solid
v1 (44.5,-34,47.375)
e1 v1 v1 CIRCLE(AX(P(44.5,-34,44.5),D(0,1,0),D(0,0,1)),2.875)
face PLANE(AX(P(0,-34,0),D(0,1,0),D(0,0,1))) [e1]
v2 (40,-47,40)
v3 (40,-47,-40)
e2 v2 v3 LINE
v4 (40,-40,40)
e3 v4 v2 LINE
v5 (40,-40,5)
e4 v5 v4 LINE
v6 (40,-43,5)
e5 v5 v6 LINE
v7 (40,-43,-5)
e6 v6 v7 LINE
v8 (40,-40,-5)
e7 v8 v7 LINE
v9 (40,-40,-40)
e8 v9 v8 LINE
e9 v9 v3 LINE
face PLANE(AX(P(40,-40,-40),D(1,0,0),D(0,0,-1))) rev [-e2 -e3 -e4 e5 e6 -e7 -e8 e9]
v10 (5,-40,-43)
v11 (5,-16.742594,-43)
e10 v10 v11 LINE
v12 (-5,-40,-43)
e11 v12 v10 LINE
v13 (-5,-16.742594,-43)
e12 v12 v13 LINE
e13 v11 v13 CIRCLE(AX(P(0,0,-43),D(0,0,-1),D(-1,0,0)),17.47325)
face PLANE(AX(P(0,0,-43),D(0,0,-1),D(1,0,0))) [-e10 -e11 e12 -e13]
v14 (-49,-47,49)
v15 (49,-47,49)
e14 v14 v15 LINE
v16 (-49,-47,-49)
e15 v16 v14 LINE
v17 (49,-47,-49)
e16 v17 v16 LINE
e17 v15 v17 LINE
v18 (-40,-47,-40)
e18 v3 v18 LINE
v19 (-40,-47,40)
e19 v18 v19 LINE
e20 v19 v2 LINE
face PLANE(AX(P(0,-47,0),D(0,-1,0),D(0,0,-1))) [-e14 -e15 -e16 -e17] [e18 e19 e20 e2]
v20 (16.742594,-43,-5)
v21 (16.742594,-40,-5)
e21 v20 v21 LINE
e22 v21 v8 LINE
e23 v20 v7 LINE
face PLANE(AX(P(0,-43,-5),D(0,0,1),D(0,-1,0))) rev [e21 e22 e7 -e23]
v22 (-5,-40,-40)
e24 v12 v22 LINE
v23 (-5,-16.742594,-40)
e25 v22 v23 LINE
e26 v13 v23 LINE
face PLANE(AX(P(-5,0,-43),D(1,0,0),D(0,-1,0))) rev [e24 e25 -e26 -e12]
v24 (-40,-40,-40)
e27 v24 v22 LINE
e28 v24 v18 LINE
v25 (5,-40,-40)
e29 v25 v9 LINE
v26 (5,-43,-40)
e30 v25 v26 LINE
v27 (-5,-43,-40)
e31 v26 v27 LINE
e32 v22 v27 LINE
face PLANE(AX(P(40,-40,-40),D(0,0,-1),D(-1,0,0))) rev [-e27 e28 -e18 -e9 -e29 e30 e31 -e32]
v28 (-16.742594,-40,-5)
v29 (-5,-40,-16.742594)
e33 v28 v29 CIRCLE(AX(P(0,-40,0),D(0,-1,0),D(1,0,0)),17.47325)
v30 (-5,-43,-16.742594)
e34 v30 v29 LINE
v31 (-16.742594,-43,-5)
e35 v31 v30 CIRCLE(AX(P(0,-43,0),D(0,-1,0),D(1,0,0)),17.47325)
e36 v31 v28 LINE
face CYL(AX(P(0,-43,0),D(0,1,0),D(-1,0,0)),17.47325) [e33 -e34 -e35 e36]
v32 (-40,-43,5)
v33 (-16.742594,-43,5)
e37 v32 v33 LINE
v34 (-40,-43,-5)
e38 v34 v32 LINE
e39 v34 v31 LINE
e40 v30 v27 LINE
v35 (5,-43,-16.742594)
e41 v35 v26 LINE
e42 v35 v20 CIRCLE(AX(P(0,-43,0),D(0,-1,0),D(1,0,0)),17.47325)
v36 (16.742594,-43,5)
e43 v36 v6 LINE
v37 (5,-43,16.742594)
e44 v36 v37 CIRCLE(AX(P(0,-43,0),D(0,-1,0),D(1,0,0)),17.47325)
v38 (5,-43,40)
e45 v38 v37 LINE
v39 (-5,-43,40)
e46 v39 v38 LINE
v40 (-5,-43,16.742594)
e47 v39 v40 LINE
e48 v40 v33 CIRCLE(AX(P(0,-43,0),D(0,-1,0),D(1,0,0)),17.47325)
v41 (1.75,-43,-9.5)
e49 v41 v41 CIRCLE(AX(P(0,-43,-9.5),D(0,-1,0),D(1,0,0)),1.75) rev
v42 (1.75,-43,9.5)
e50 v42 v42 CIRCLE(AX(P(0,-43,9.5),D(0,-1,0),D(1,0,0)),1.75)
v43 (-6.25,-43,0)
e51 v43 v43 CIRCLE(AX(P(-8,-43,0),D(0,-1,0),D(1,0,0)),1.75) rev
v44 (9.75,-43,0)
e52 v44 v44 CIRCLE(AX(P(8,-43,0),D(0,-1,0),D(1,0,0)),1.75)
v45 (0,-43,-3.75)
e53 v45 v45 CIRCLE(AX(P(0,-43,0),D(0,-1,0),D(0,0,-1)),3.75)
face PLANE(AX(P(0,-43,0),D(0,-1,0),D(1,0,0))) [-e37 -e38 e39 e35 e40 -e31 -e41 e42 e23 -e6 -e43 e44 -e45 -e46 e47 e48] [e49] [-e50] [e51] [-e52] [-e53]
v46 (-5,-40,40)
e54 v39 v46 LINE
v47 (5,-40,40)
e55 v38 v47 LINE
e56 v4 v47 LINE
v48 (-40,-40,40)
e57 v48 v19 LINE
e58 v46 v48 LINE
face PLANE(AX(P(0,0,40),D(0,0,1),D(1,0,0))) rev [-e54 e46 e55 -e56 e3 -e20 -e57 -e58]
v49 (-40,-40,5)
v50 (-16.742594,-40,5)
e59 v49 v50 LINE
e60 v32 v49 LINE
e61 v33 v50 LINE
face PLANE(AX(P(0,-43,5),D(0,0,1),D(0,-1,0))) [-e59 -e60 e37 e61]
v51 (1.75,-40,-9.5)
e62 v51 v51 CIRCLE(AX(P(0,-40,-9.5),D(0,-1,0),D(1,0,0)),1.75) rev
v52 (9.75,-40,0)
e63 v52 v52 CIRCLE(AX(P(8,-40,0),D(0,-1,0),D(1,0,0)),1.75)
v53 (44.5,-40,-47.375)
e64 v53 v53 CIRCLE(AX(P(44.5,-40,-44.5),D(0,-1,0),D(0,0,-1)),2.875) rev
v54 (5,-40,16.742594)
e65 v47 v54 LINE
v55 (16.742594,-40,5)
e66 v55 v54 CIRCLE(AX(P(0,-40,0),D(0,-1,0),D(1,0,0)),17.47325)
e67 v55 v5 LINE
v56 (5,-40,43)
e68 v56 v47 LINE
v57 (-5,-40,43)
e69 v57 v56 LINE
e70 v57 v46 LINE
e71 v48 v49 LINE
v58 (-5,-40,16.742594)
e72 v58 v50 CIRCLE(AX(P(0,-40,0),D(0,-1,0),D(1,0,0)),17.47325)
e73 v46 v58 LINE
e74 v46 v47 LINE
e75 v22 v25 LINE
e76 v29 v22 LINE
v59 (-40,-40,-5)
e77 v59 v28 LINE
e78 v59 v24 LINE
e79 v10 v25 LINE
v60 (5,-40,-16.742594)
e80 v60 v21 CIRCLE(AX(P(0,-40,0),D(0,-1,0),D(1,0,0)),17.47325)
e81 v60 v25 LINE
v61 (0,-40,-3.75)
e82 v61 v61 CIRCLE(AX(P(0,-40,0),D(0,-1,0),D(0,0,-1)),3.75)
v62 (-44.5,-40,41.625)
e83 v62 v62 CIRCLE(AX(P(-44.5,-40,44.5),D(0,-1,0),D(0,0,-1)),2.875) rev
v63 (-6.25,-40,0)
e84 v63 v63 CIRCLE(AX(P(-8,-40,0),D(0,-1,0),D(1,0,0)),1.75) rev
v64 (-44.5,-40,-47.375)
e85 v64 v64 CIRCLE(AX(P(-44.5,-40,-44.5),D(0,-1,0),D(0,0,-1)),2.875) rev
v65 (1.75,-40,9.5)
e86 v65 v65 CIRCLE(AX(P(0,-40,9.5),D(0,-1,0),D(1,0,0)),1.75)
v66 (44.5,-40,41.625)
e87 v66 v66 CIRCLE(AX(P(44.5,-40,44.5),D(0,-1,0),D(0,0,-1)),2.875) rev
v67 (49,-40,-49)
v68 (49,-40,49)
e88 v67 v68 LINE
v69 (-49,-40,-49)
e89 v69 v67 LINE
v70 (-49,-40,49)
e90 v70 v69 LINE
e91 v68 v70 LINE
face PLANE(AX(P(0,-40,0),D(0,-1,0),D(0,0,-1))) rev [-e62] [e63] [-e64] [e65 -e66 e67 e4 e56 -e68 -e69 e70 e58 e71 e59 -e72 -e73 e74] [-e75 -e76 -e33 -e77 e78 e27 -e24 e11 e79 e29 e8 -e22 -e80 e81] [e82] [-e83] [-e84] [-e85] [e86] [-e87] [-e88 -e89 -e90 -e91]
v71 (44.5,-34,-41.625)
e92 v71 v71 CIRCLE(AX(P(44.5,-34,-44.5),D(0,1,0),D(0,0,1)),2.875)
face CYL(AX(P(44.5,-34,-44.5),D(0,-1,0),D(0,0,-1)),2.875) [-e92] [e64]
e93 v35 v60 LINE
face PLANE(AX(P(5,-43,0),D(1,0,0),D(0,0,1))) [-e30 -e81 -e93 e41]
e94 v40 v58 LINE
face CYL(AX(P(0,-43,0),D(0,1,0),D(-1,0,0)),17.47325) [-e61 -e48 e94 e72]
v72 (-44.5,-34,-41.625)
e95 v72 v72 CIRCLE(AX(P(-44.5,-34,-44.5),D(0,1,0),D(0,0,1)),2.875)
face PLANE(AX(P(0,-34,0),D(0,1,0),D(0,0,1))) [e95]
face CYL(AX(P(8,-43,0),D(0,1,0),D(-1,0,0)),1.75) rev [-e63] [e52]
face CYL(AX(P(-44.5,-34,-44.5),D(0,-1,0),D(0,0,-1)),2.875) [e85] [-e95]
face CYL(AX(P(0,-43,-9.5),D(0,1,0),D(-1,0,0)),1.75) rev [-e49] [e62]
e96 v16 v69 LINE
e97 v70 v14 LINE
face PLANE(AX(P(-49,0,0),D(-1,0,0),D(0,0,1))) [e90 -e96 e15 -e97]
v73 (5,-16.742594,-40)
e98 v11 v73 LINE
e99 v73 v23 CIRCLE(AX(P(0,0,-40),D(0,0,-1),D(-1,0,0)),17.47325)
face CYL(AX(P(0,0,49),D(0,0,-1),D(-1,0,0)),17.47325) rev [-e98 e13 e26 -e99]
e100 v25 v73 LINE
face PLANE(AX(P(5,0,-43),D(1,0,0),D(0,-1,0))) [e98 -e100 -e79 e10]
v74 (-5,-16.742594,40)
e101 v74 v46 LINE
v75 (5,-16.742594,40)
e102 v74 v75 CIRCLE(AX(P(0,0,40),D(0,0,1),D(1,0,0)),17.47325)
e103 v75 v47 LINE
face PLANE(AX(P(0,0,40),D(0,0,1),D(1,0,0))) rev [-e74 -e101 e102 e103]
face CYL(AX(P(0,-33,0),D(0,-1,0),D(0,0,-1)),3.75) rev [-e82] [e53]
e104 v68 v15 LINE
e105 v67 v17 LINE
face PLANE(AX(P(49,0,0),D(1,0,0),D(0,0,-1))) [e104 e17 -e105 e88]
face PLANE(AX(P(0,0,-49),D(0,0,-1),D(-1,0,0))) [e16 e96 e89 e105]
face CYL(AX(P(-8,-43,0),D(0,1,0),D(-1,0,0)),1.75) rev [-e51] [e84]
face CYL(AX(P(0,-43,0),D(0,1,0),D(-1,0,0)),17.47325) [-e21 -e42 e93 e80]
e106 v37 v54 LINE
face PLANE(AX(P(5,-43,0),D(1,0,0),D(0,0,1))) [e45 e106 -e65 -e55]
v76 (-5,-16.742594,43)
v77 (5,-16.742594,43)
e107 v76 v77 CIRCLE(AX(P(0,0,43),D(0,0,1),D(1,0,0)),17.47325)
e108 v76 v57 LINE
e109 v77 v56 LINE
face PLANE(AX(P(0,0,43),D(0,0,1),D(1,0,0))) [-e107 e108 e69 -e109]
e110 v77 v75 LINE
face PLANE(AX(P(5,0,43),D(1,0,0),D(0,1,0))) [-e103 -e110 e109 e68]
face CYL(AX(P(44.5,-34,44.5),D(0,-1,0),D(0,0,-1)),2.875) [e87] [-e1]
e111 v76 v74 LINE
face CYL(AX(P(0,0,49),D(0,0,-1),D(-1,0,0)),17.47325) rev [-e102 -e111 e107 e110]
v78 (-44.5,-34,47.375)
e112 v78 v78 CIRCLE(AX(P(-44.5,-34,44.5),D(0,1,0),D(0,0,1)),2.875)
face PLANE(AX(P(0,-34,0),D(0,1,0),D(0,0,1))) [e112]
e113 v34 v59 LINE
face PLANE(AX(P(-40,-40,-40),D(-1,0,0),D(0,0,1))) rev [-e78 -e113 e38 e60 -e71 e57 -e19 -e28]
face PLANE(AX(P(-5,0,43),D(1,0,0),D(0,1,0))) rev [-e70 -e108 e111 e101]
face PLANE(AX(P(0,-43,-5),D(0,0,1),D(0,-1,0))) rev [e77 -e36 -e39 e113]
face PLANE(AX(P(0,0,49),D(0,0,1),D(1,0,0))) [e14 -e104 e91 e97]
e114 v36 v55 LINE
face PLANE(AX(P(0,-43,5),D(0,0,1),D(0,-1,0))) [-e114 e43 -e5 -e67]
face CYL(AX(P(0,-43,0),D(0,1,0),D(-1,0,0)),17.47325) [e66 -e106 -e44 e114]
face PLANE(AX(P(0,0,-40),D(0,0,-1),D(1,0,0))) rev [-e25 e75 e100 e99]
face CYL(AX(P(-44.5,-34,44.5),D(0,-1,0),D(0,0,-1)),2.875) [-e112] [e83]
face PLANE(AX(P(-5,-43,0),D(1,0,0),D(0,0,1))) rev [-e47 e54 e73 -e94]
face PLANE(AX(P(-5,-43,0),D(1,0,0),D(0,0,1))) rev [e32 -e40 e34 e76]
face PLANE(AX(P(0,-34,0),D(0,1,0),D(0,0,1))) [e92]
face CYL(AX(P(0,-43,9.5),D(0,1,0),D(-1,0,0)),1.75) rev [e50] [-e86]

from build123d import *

# Parameters (mm, degrees)
SKETCH2_R                  = 1.75
SKETCH2_W                  = 10
SKETCH2_H                  = 10
BOSS_EXTRUDE1_DEPTH        = 3
CIRPATTERN1_COUNT          = 4
CIRPATTERN2_START          = 40
CIRPATTERN2_OUTLINE_R      = 1.75
CIRPATTERN2_DEPTH          = 3
CIRPATTERN2_START_2        = -43
CIRPATTERN2_2_OUTLINE_R    = 1.75
CIRPATTERN2_2_DEPTH        = 3
CIRPATTERN2_3_OUTLINE_R    = 1.75
CIRPATTERN2_3_DEPTH        = 3
CIRPATTERN2_4_OUTLINE_R    = 1.75
CIRPATTERN2_4_DEPTH        = 3
BOSS_EXTRUDE2_DEPTH        = 50
BOSS_EXTRUDE2_DEPTH_BACK   = 50
SKETCH3_W                  = 10
SKETCH3_H                  = 10
BOSS_EXTRUDE2_2_DEPTH      = 50
BOSS_EXTRUDE2_2_DEPTH_BACK = 50
BOSS_EXTRUDE2_3_DEPTH      = 50
BOSS_EXTRUDE2_3_DEPTH_BACK = 50
BOSS_EXTRUDE2_4_DEPTH      = 50
BOSS_EXTRUDE2_4_DEPTH_BACK = 50
SKETCH4_W                  = 100
SKETCH4_H                  = 100
SKETCH4_W_2                = 80
SKETCH4_H_2                = 80
BOSS_EXTRUDE3_DEPTH        = 10
SKETCH5_W                  = 100
SKETCH5_H                  = 100
SKETCH5_W_2                = 80
SKETCH5_H_2                = 80
BOSS_EXTRUDE4_DEPTH        = 5
CUT_EXTRUDE1_START         = -100
CUT_EXTRUDE1_DEPTH         = 100
CUT_EXTRUDE1_START_2       = -55
CUT_EXTRUDE1_2_OUTLINE_W   = 10
CUT_EXTRUDE1_2_OUTLINE_H   = 3
CUT_EXTRUDE1_2_DEPTH       = 10
CUT_EXTRUDE1_3_OUTLINE_W   = 90
CUT_EXTRUDE1_3_OUTLINE_H   = 3
CUT_EXTRUDE1_3_DEPTH       = 100
SKETCH7_R                  = 3.75
CUT_EXTRUDE2_DEPTH         = 10
SKETCH8_R                  = 3.75
CUT_EXTRUDE3_DEPTH         = 117.828934772
SKETCH9_R                  = 3.75
CUT_EXTRUDE4_DEPTH         = 117.828934772
SKETCH10_W                 = 100
SKETCH10_H                 = 100
CUT_EXTRUDE5_DEPTH         = 3
CUT_EXTRUDE6_DEPTH         = 1
SKETCH12_W                 = 99
SKETCH12_H                 = 97
CUT_EXTRUDE7_DEPTH         = 1
CUT_EXTRUDE8_DEPTH         = 1
SKETCH14_W                 = 98
SKETCH14_H                 = 97
CUT_EXTRUDE9_DEPTH         = 1
CUT_EXTRUDE10_DEPTH        = 117.404467268
CUT_EXTRUDE10_DEPTH_BACK   = 117.404467268
SKETCH15_W                 = 9
SKETCH15_H                 = 5
SKETCH16_R                 = 3.125
CUT_EXTRUDE11_DEPTH        = 8
SKETCH18_W                 = 98
SKETCH18_H                 = 98
SKETCH18_W_2               = 33.4851887
SKETCH18_H_2               = 3
CUT_EXTRUDE12_DEPTH        = 85
SKETCH20_R                 = 2.875
BOSS_EXTRUDE5_DEPTH        = 6
SKETCH21_R                 = 1.75
SKETCH21_R_2               = 3.75
CUT_EXTRUDE13_DEPTH        = 115.341593482


with BuildPart() as part:
    # Sketch2 → Boss-Extrude1 (new body)
    # profile 1 of 13: a face of its own
    with BuildSketch(Plane.XY.offset(40)):
        with BuildLine():
            ThreePointArc((5, -16.74259435), (0, -17.47325), (-5, -16.74259435))
            Line((-5, -16.74259435), (-5, -50))
            Line((-5, -50), (5, -50))
            Line((5, -50), (5, -16.74259435))
        make_face()
    # profile 2 of 13: a face of its own
    with BuildSketch(Plane.XY.offset(40)):
        with BuildLine():
            Line((5, -5), (-5, -5))
            Line((-5, -5), (-5, -16.74259435))
            ThreePointArc((-5, -16.74259435), (0, -17.47325), (5, -16.74259435))
            Line((5, -16.74259435), (5, -5))
        make_face()
        with Locations((0, -9.5)):
            Circle(SKETCH2_R, mode=Mode.SUBTRACT)
    # profile 3 of 13: a face of its own
    with BuildSketch(Plane.XY.offset(40)):
        with BuildLine():
            Line((16.74259435, -5), (5, -5))
            Line((5, -5), (5, -16.74259435))
            ThreePointArc((5, -16.74259435), (12.355453564, -12.355453564), (16.74259435, -5))
        make_face()
    # profile 4 of 13: a face of its own
    with BuildSketch(Plane.XY.offset(40)):
        with BuildLine():
            Line((5, 5), (5, -5))
            Line((5, -5), (16.74259435, -5))
            ThreePointArc((16.74259435, -5), (17.289621197, -2.526551883), (17.47325, 0))
            ThreePointArc((17.47325, 0), (17.289621197, 2.526551883), (16.74259435, 5))
            Line((16.74259435, 5), (5, 5))
        make_face()
        with Locations((8, 0)):
            Circle(SKETCH2_R, mode=Mode.SUBTRACT)
    # profile 5 of 13: a face of its own
    with BuildSketch(Plane.XY.offset(40)):
        Rectangle(SKETCH2_W, SKETCH2_H)
    # profile 6 of 13: a face of its own
    with BuildSketch(Plane.XY.offset(40)):
        with BuildLine():
            Line((-5, -5), (-16.74259435, -5))
            ThreePointArc((-16.74259435, -5), (-12.355453564, -12.355453564), (-5, -16.74259435))
            Line((-5, -16.74259435), (-5, -5))
        make_face()
    # profile 7 of 13: a face of its own
    with BuildSketch(Plane.XY.offset(40)):
        with BuildLine():
            ThreePointArc((-16.74259435, 5), (-17.47325, 0), (-16.74259435, -5))
            Line((-16.74259435, -5), (-5, -5))
            Line((-5, -5), (-5, 5))
            Line((-5, 5), (-16.74259435, 5))
        make_face()
        with Locations((-8, 0)):
            Circle(SKETCH2_R, mode=Mode.SUBTRACT)
    # profile 8 of 13: a face of its own
    with BuildSketch(Plane.XY.offset(40)):
        with BuildLine():
            ThreePointArc((-5, 16.74259435), (-12.355453564, 12.355453564), (-16.74259435, 5))
            Line((-16.74259435, 5), (-5, 5))
            Line((-5, 5), (-5, 16.74259435))
        make_face()
    # profile 9 of 13: a face of its own
    with BuildSketch(Plane.XY.offset(40)):
        with BuildLine():
            Line((-5, 16.74259435), (-5, 5))
            Line((-5, 5), (5, 5))
            Line((5, 5), (5, 16.74259435))
            ThreePointArc((5, 16.74259435), (0, 17.47325), (-5, 16.74259435))
        make_face()
        with Locations((0, 9.5)):
            Circle(SKETCH2_R, mode=Mode.SUBTRACT)
    # profile 10 of 13: a face of its own
    with BuildSketch(Plane.XY.offset(40)):
        with BuildLine():
            Line((5, 16.74259435), (5, 5))
            Line((5, 5), (16.74259435, 5))
            ThreePointArc((16.74259435, 5), (12.355453564, 12.355453564), (5, 16.74259435))
        make_face()
    # profile 11 of 13: a face of its own
    with BuildSketch(Plane.XY.offset(40)):
        with BuildLine():
            ThreePointArc((17.47325, 0), (17.289621197, -2.526551883), (16.74259435, -5))
            Line((16.74259435, -5), (50, -5))
            Line((50, -5), (50, 5))
            Line((50, 5), (16.74259435, 5))
            ThreePointArc((16.74259435, 5), (17.289621197, 2.526551883), (17.47325, 0))
        make_face()
    # profile 12 of 13: a face of its own
    with BuildSketch(Plane.XY.offset(40)):
        with BuildLine():
            Line((-50, 5), (-50, -5))
            Line((-50, -5), (-16.74259435, -5))
            ThreePointArc((-16.74259435, -5), (-17.47325, 0), (-16.74259435, 5))
            Line((-16.74259435, 5), (-50, 5))
        make_face()
    # profile 13 of 13: a face of its own
    with BuildSketch(Plane.XY.offset(40)):
        with BuildLine():
            Line((-5, 50), (-5, 16.74259435))
            ThreePointArc((-5, 16.74259435), (0, 17.47325), (5, 16.74259435))
            Line((5, 16.74259435), (5, 50))
            Line((5, 50), (-5, 50))
        make_face()
    extrude(amount=BOSS_EXTRUDE1_DEPTH)


with BuildPart() as cirpattern1_1:
    # CirPattern1: pattern copy
    add(part.part.rotate(Axis((0, 0, 0), (1, 0, 0)), 1 * 360 / CIRPATTERN1_COUNT))


with BuildPart() as cirpattern1_2:
    # CirPattern1: pattern copy
    add(part.part.rotate(Axis((0, 0, 0), (1, 0, 0)), 2 * 360 / CIRPATTERN1_COUNT))


with BuildPart() as cirpattern1_3:
    # CirPattern1: pattern copy
    add(part.part.rotate(Axis((0, 0, 0), (1, 0, 0)), 3 * 360 / CIRPATTERN1_COUNT))

    # Cut-Extrude1 3 outline → Cut-Extrude1 3 (cut)
    with BuildSketch(Plane.ZY.offset(50).offset(CUT_EXTRUDE1_START)):
        with Locations((5, 41.5)):
            Rectangle(CUT_EXTRUDE1_3_OUTLINE_W, CUT_EXTRUDE1_3_OUTLINE_H)
    extrude(amount=CUT_EXTRUDE1_3_DEPTH, mode=Mode.SUBTRACT)


with BuildPart() as body_5:
    # CirPattern2: read off the stored shape, not the designer's step
    # CirPattern2 outline → CirPattern2 (new body)
    with BuildSketch(Plane.XY.offset(CIRPATTERN2_START)):
        with BuildLine():
            ThreePointArc((5, -16.74259435), (12.355453564, -12.355453564), (16.74259435, -5))
            Line((16.74259435, -5), (50, -5))
            Line((50, -5), (50, 5))
            Line((50, 5), (16.74259435, 5))
            ThreePointArc((16.74259435, 5), (12.355453564, 12.355453564), (5, 16.74259435))
            Line((5, 16.74259435), (5, 50))
            Line((5, 50), (-5, 50))
            Line((-5, 50), (-5, 16.74259435))
            ThreePointArc((-5, 16.74259435), (-12.355453564, 12.355453564), (-16.74259435, 5))
            Line((-16.74259435, 5), (-50, 5))
            Line((-50, 5), (-50, -5))
            Line((-50, -5), (-16.74259435, -5))
            ThreePointArc((-16.74259435, -5), (-12.355453564, -12.355453564), (-5, -16.74259435))
            Line((-5, -16.74259435), (-5, -50))
            Line((-5, -50), (5, -50))
            Line((5, -50), (5, -16.74259435))
        make_face()
        with Locations((0, -9.5)):
            Circle(CIRPATTERN2_OUTLINE_R, mode=Mode.SUBTRACT)
        with Locations((-8, 0)):
            Circle(CIRPATTERN2_OUTLINE_R, mode=Mode.SUBTRACT)
        with Locations((8, 0)):
            Circle(CIRPATTERN2_OUTLINE_R, mode=Mode.SUBTRACT)
        with Locations((0, 9.5)):
            Circle(CIRPATTERN2_OUTLINE_R, mode=Mode.SUBTRACT)
    extrude(amount=CIRPATTERN2_DEPTH)


with BuildPart() as body_6:
    # CirPattern2 2 outline → CirPattern2 2 (new body)
    with BuildSketch(Plane.YZ.offset(CIRPATTERN2_START_2)):
        with BuildLine():
            Line((-5, 50), (-5, 16.74259435))
            ThreePointArc((-5, 16.74259435), (-12.355453564, 12.355453564), (-16.74259435, 5))
            Line((-16.74259435, 5), (-50, 5))
            Line((-50, 5), (-50, -5))
            Line((-50, -5), (-16.74259435, -5))
            ThreePointArc((-16.74259435, -5), (-12.355453564, -12.355453564), (-5, -16.74259435))
            Line((-5, -16.74259435), (-5, -50))
            Line((-5, -50), (5, -50))
            Line((5, -50), (5, -16.74259435))
            ThreePointArc((5, -16.74259435), (12.355453564, -12.355453564), (16.74259435, -5))
            Line((16.74259435, -5), (50, -5))
            Line((50, -5), (50, 5))
            Line((50, 5), (16.74259435, 5))
            ThreePointArc((16.74259435, 5), (12.355453564, 12.355453564), (5, 16.74259435))
            Line((5, 16.74259435), (5, 50))
            Line((5, 50), (-5, 50))
        make_face()
        with Locations((0, -8)):
            Circle(CIRPATTERN2_2_OUTLINE_R, mode=Mode.SUBTRACT)
        with Locations((-9.5, 0)):
            Circle(CIRPATTERN2_2_OUTLINE_R, mode=Mode.SUBTRACT)
        with Locations((9.5, 0)):
            Circle(CIRPATTERN2_2_OUTLINE_R, mode=Mode.SUBTRACT)
        with Locations((0, 8)):
            Circle(CIRPATTERN2_2_OUTLINE_R, mode=Mode.SUBTRACT)
    extrude(amount=CIRPATTERN2_2_DEPTH)


with BuildPart() as body_7:
    # CirPattern2 3 outline → CirPattern2 3 (new body)
    with BuildSketch(Plane.YZ.offset(CIRPATTERN2_START)):
        with BuildLine():
            ThreePointArc((-16.74259435, -5), (-12.355453564, -12.355453564), (-5, -16.74259435))
            Line((-5, -16.74259435), (-5, -50))
            Line((-5, -50), (5, -50))
            Line((5, -50), (5, -16.74259435))
            ThreePointArc((5, -16.74259435), (12.355453564, -12.355453564), (16.74259435, -5))
            Line((16.74259435, -5), (50, -5))
            Line((50, -5), (50, 5))
            Line((50, 5), (16.74259435, 5))
            ThreePointArc((16.74259435, 5), (12.355453564, 12.355453564), (5, 16.74259435))
            Line((5, 16.74259435), (5, 50))
            Line((5, 50), (-5, 50))
            Line((-5, 50), (-5, 16.74259435))
            ThreePointArc((-5, 16.74259435), (-12.355453564, 12.355453564), (-16.74259435, 5))
            Line((-16.74259435, 5), (-50, 5))
            Line((-50, 5), (-50, -5))
            Line((-50, -5), (-16.74259435, -5))
        make_face()
        with Locations((0, -8)):
            Circle(CIRPATTERN2_3_OUTLINE_R, mode=Mode.SUBTRACT)
        with Locations((-9.5, 0)):
            Circle(CIRPATTERN2_3_OUTLINE_R, mode=Mode.SUBTRACT)
        with Locations((9.5, 0)):
            Circle(CIRPATTERN2_3_OUTLINE_R, mode=Mode.SUBTRACT)
        with Locations((0, 8)):
            Circle(CIRPATTERN2_3_OUTLINE_R, mode=Mode.SUBTRACT)
    extrude(amount=CIRPATTERN2_3_DEPTH)


with BuildPart() as body_8:
    # CirPattern2 4 outline → CirPattern2 4 (new body)
    with BuildSketch(Plane.XY.offset(CIRPATTERN2_START_2)):
        with BuildLine():
            Line((50, 5), (16.74259435, 5))
            ThreePointArc((16.74259435, 5), (12.355453564, 12.355453564), (5, 16.74259435))
            Line((5, 16.74259435), (5, 50))
            Line((5, 50), (-5, 50))
            Line((-5, 50), (-5, 16.74259435))
            ThreePointArc((-5, 16.74259435), (-12.355453564, 12.355453564), (-16.74259435, 5))
            Line((-16.74259435, 5), (-50, 5))
            Line((-50, 5), (-50, -5))
            Line((-50, -5), (-16.74259435, -5))
            ThreePointArc((-16.74259435, -5), (-12.355453564, -12.355453564), (-5, -16.74259435))
            Line((-5, -16.74259435), (-5, -50))
            Line((-5, -50), (5, -50))
            Line((5, -50), (5, -16.74259435))
            ThreePointArc((5, -16.74259435), (12.355453564, -12.355453564), (16.74259435, -5))
            Line((16.74259435, -5), (50, -5))
            Line((50, -5), (50, 5))
        make_face()
        with Locations((0, -9.5)):
            Circle(CIRPATTERN2_4_OUTLINE_R, mode=Mode.SUBTRACT)
        with Locations((-8, 0)):
            Circle(CIRPATTERN2_4_OUTLINE_R, mode=Mode.SUBTRACT)
        with Locations((8, 0)):
            Circle(CIRPATTERN2_4_OUTLINE_R, mode=Mode.SUBTRACT)
        with Locations((0, 9.5)):
            Circle(CIRPATTERN2_4_OUTLINE_R, mode=Mode.SUBTRACT)
    extrude(amount=CIRPATTERN2_4_DEPTH)


with BuildPart() as body_9:
    # Sketch3 → Boss-Extrude2 (new, two sides: drawn at the far end of the back side and taken through both)
    with BuildSketch(Plane(origin=(0, 0, 0), x_dir=(1, 0, 0), z_dir=(0, 1, 0)).offset(-BOSS_EXTRUDE2_DEPTH_BACK)):
        with Locations((-45, -45)):
            Rectangle(SKETCH3_W, SKETCH3_H)
    extrude(amount=BOSS_EXTRUDE2_DEPTH + BOSS_EXTRUDE2_DEPTH_BACK)


with BuildPart() as body_10:
    # Sketch3 → Boss-Extrude2 2 (new, two sides: drawn at the far end of the back side and taken through both)
    with BuildSketch(Plane(origin=(0, 0, 0), x_dir=(1, 0, 0), z_dir=(0, 1, 0)).offset(-BOSS_EXTRUDE2_2_DEPTH_BACK)):
        with Locations((45, -45)):
            Rectangle(SKETCH3_W, SKETCH3_H)
    extrude(amount=BOSS_EXTRUDE2_2_DEPTH + BOSS_EXTRUDE2_2_DEPTH_BACK)


with BuildPart() as body_11:
    # Sketch3 → Boss-Extrude2 3 (new, two sides: drawn at the far end of the back side and taken through both)
    with BuildSketch(Plane(origin=(0, 0, 0), x_dir=(1, 0, 0), z_dir=(0, 1, 0)).offset(-BOSS_EXTRUDE2_3_DEPTH_BACK)):
        with Locations((45, 45)):
            Rectangle(SKETCH3_W, SKETCH3_H)
    extrude(amount=BOSS_EXTRUDE2_3_DEPTH + BOSS_EXTRUDE2_3_DEPTH_BACK)


with BuildPart() as body_12:
    # Sketch3 → Boss-Extrude2 4 (new, two sides: drawn at the far end of the back side and taken through both)
    with BuildSketch(Plane(origin=(0, 0, 0), x_dir=(1, 0, 0), z_dir=(0, 1, 0)).offset(-BOSS_EXTRUDE2_4_DEPTH_BACK)):
        with Locations((-45, 45)):
            Rectangle(SKETCH3_W, SKETCH3_H)
    extrude(amount=BOSS_EXTRUDE2_4_DEPTH + BOSS_EXTRUDE2_4_DEPTH_BACK)


with BuildPart() as part_1:
    add(part.part)

    add(cirpattern1_1.part)  # Boss-Extrude3 merges CirPattern1_1

    add(cirpattern1_2.part)  # Boss-Extrude3 merges CirPattern1_2

    add(body_5.part)  # Boss-Extrude3 merges body 5

    add(body_6.part)  # Boss-Extrude3 merges body 6

    add(body_7.part)  # Boss-Extrude3 merges body 7

    add(body_8.part)  # Boss-Extrude3 merges body 8

    add(body_9.part)  # Boss-Extrude3 merges body 9

    add(body_10.part)  # Boss-Extrude3 merges body 10

    add(body_11.part)  # Boss-Extrude3 merges body 11

    add(body_12.part)  # Boss-Extrude3 merges body 12
    # Sketch4 → Boss-Extrude3 (add)
    with BuildSketch(Plane.XZ.offset(50)):
        Rectangle(SKETCH4_W, SKETCH4_H)
        Rectangle(SKETCH4_W_2, SKETCH4_H_2, mode=Mode.SUBTRACT)
    extrude(amount=-BOSS_EXTRUDE3_DEPTH)

    # Sketch5 → Boss-Extrude4 (add)
    with BuildSketch(Plane(origin=(0, 50, 0), x_dir=(1, 0, 0), z_dir=(0, 1, 0))):
        Rectangle(SKETCH5_W, SKETCH5_H)
        Rectangle(SKETCH5_W_2, SKETCH5_H_2, mode=Mode.SUBTRACT)
    extrude(amount=-BOSS_EXTRUDE4_DEPTH)

    # Cut-Extrude1: read off the stored shape, not the designer's step
    # Cut-Extrude1 outline → Cut-Extrude1 (cut)
    with BuildSketch(Plane.ZY.offset(50).offset(CUT_EXTRUDE1_START)):
        with BuildLine():
            Line((40, 50), (-40, 50))
            Line((-40, 50), (-40, 45))
            Line((-40, 45), (-5, 45))
            Line((-5, 45), (-5, 16.74259435))
            ThreePointArc((-5, 16.74259435), (0, 17.47325), (5, 16.74259435))
            Line((5, 16.74259435), (5, 45))
            Line((5, 45), (40, 45))
            Line((40, 45), (40, 50))
        make_face()
    extrude(amount=CUT_EXTRUDE1_DEPTH, mode=Mode.SUBTRACT)

    # Sketch7 → Cut-Extrude2 (cut)
    with BuildSketch(Plane.XZ.offset(43)):
        with Locations(Location((0, 0, 0), (0, 0, 270))):
            Circle(SKETCH7_R)
    extrude(amount=-CUT_EXTRUDE2_DEPTH, mode=Mode.SUBTRACT)

    # Sketch8 → Cut-Extrude3 (cut, through all)
    with BuildSketch(Plane.ZY.offset(43)):
        Circle(SKETCH8_R)
    extrude(amount=-CUT_EXTRUDE3_DEPTH, mode=Mode.SUBTRACT)

    # Sketch9 → Cut-Extrude4 (cut, through all)
    with BuildSketch(Plane(origin=(0, 0, -43), x_dir=(-1, 0, 0), z_dir=(0, 0, -1))):
        Circle(SKETCH9_R)
    extrude(amount=-CUT_EXTRUDE4_DEPTH, mode=Mode.SUBTRACT)

    # Sketch10 → Cut-Extrude5 (cut)
    with BuildSketch(Plane.XZ.offset(50)):
        Rectangle(SKETCH10_W, SKETCH10_H)
    extrude(amount=-CUT_EXTRUDE5_DEPTH, mode=Mode.SUBTRACT)

    # Sketch11 → Cut-Extrude6 (cut)
    with BuildSketch(Plane.ZY.offset(50)):
        Polygon((50, 50), (40, 50), (40, -40), (-40, -40), (-40, 50), (-50, 50), (-50, -47), (50, -47), align=None)
    extrude(amount=-CUT_EXTRUDE6_DEPTH, mode=Mode.SUBTRACT)

    # Sketch12 → Cut-Extrude7 (cut)
    with BuildSketch(Plane.XY.offset(50)):
        with Locations((0.5, 1.5)):
            Rectangle(SKETCH12_W, SKETCH12_H)
    extrude(amount=-CUT_EXTRUDE7_DEPTH, mode=Mode.SUBTRACT)

    # Sketch13 → Cut-Extrude8 (cut)
    with BuildSketch(Plane(origin=(50, 0, 0), x_dir=(0, 0, -1), z_dir=(1, 0, 0))):
        Polygon((50, 50), (40, 50), (40, -40), (-40, -40), (-40, 50), (-49, 50), (-49, -47), (50, -47), align=None)
    extrude(amount=-CUT_EXTRUDE8_DEPTH, mode=Mode.SUBTRACT)

    # Sketch14 → Cut-Extrude9 (cut)
    with BuildSketch(Plane(origin=(0, 0, -50), x_dir=(-1, 0, 0), z_dir=(0, 0, -1))):
        with Locations((0, 1.5)):
            Rectangle(SKETCH14_W, SKETCH14_H)
    extrude(amount=-CUT_EXTRUDE9_DEPTH, mode=Mode.SUBTRACT)


with BuildPart() as body_3:
    # Cut-Extrude1 2 outline → Cut-Extrude1 2 (new body)
    with BuildSketch(Plane.ZY.offset(50).offset(CUT_EXTRUDE1_START_2)):
        with Locations((45, 41.5)):
            Rectangle(CUT_EXTRUDE1_2_OUTLINE_W, CUT_EXTRUDE1_2_OUTLINE_H)
    extrude(amount=CUT_EXTRUDE1_2_DEPTH)


with BuildPart() as cut_extrude10_tool:
    # Sketch15 → Cut-Extrude10 (new, two sides: drawn at the far end of the back side and taken through both)
    with BuildSketch(Plane.XY.offset(43).offset(-CUT_EXTRUDE10_DEPTH_BACK)):
        with Locations((-44.5, 47.5)):
            Rectangle(SKETCH15_W, SKETCH15_H)
        Polygon((-40, 50), (-40, 45), (-5, 45), (5, 45), (40, 45), (40, 50), align=None)
        with Locations((44.5, 47.5)):
            Rectangle(SKETCH15_W, SKETCH15_H)
        with BuildLine():
            Line((5, 45), (-5, 45))
            Line((-5, 45), (-5, 16.74259435))
            ThreePointArc((-5, 16.74259435), (0, 17.47325), (5, 16.74259435))
            Line((5, 16.74259435), (5, 45))
        make_face()
    extrude(amount=CUT_EXTRUDE10_DEPTH + CUT_EXTRUDE10_DEPTH_BACK)


with BuildPart() as part_2:
    add(part_1.part)

    # Cut-Extrude10: cut by cut_extrude10_tool
    add(cut_extrude10_tool.part, mode=Mode.SUBTRACT)

    # Sketch16 → Cut-Extrude11 (cut)
    with BuildSketch(Plane(origin=(0, 45, 0), x_dir=(1, 0, 0), z_dir=(0, 1, 0))):
        with Locations(Location((-44.5, -44.5, 0), (0, 0, 270))):
            Circle(SKETCH16_R)
        with Locations(Location((44.5, -44.5, 0), (0, 0, 90))):
            Circle(SKETCH16_R)
        with Locations(Location((44.5, 44.5, 0), (0, 0, 270))):
            Circle(SKETCH16_R)
        with Locations(Location((-44.5, 44.5, 0), (0, 0, 90))):
            Circle(SKETCH16_R)
    extrude(amount=-CUT_EXTRUDE11_DEPTH, mode=Mode.SUBTRACT)

    # Sketch18 → Cut-Extrude12 (cut)
    with BuildSketch(Plane(origin=(0, 45, 0), x_dir=(1, 0, 0), z_dir=(0, 1, 0))):
        Rectangle(SKETCH18_W, SKETCH18_H)
        with Locations((0, 41.5)):
            Rectangle(SKETCH18_W_2, SKETCH18_H_2, mode=Mode.SUBTRACT)
        with Locations((0, -41.5)):
            Rectangle(SKETCH18_W_2, SKETCH18_H_2, mode=Mode.SUBTRACT)
    extrude(amount=-CUT_EXTRUDE12_DEPTH, mode=Mode.SUBTRACT)

    # Sketch20 → Boss-Extrude5 (add)
    with BuildSketch(Plane(origin=(0, -40, 0), x_dir=(1, 0, 0), z_dir=(0, 1, 0))):
        with Locations(Location((44.5, 44.5, 0), (0, 0, 90))):
            Circle(SKETCH20_R)
        with Locations(Location((44.5, -44.5, 0), (0, 0, 90))):
            Circle(SKETCH20_R)
        with Locations(Location((-44.5, -44.5, 0), (0, 0, 90))):
            Circle(SKETCH20_R)
        with Locations(Location((-44.5, 44.5, 0), (0, 0, 90))):
            Circle(SKETCH20_R)
    extrude(amount=BOSS_EXTRUDE5_DEPTH)

    # Sketch21 → Cut-Extrude13 (cut, through all)
    with BuildSketch(Plane(origin=(0, 0, -43), x_dir=(-1, 0, 0), z_dir=(0, 0, -1))):
        with BuildLine():
            ThreePointArc((5, -16.74259435), (12.355453564, -12.355453564), (16.74259435, -5))
            Line((16.74259435, -5), (16.74259435, 5))
            ThreePointArc((16.74259435, 5), (0, 17.47325), (-16.74259435, 5))
            Line((-16.74259435, 5), (-16.74259435, -5))
            ThreePointArc((-16.74259435, -5), (-12.355453564, -12.355453564), (-5, -16.74259435))
            ThreePointArc((-5, -16.74259435), (0, -17.47325), (5, -16.74259435))
        make_face()
        with Locations((-8, 0)):
            Circle(SKETCH21_R, mode=Mode.SUBTRACT)
        with Locations((0, -9.5)):
            Circle(SKETCH21_R, mode=Mode.SUBTRACT)
        Circle(SKETCH21_R_2, mode=Mode.SUBTRACT)
        with Locations((8, 0)):
            Circle(SKETCH21_R, mode=Mode.SUBTRACT)
        with Locations((0, 9.5)):
            Circle(SKETCH21_R, mode=Mode.SUBTRACT)
    extrude(amount=-CUT_EXTRUDE13_DEPTH, mode=Mode.SUBTRACT)


with BuildPart() as cirpattern1_3_1:
    add(cirpattern1_3.part)

    # Cut-Extrude10: cut by cut_extrude10_tool
    add(cut_extrude10_tool.part, mode=Mode.SUBTRACT)


with BuildPart() as body_3_1:
    add(body_3.part)

    # Cut-Extrude10: cut by cut_extrude10_tool
    add(cut_extrude10_tool.part, mode=Mode.SUBTRACT)


solid = part_2.part
